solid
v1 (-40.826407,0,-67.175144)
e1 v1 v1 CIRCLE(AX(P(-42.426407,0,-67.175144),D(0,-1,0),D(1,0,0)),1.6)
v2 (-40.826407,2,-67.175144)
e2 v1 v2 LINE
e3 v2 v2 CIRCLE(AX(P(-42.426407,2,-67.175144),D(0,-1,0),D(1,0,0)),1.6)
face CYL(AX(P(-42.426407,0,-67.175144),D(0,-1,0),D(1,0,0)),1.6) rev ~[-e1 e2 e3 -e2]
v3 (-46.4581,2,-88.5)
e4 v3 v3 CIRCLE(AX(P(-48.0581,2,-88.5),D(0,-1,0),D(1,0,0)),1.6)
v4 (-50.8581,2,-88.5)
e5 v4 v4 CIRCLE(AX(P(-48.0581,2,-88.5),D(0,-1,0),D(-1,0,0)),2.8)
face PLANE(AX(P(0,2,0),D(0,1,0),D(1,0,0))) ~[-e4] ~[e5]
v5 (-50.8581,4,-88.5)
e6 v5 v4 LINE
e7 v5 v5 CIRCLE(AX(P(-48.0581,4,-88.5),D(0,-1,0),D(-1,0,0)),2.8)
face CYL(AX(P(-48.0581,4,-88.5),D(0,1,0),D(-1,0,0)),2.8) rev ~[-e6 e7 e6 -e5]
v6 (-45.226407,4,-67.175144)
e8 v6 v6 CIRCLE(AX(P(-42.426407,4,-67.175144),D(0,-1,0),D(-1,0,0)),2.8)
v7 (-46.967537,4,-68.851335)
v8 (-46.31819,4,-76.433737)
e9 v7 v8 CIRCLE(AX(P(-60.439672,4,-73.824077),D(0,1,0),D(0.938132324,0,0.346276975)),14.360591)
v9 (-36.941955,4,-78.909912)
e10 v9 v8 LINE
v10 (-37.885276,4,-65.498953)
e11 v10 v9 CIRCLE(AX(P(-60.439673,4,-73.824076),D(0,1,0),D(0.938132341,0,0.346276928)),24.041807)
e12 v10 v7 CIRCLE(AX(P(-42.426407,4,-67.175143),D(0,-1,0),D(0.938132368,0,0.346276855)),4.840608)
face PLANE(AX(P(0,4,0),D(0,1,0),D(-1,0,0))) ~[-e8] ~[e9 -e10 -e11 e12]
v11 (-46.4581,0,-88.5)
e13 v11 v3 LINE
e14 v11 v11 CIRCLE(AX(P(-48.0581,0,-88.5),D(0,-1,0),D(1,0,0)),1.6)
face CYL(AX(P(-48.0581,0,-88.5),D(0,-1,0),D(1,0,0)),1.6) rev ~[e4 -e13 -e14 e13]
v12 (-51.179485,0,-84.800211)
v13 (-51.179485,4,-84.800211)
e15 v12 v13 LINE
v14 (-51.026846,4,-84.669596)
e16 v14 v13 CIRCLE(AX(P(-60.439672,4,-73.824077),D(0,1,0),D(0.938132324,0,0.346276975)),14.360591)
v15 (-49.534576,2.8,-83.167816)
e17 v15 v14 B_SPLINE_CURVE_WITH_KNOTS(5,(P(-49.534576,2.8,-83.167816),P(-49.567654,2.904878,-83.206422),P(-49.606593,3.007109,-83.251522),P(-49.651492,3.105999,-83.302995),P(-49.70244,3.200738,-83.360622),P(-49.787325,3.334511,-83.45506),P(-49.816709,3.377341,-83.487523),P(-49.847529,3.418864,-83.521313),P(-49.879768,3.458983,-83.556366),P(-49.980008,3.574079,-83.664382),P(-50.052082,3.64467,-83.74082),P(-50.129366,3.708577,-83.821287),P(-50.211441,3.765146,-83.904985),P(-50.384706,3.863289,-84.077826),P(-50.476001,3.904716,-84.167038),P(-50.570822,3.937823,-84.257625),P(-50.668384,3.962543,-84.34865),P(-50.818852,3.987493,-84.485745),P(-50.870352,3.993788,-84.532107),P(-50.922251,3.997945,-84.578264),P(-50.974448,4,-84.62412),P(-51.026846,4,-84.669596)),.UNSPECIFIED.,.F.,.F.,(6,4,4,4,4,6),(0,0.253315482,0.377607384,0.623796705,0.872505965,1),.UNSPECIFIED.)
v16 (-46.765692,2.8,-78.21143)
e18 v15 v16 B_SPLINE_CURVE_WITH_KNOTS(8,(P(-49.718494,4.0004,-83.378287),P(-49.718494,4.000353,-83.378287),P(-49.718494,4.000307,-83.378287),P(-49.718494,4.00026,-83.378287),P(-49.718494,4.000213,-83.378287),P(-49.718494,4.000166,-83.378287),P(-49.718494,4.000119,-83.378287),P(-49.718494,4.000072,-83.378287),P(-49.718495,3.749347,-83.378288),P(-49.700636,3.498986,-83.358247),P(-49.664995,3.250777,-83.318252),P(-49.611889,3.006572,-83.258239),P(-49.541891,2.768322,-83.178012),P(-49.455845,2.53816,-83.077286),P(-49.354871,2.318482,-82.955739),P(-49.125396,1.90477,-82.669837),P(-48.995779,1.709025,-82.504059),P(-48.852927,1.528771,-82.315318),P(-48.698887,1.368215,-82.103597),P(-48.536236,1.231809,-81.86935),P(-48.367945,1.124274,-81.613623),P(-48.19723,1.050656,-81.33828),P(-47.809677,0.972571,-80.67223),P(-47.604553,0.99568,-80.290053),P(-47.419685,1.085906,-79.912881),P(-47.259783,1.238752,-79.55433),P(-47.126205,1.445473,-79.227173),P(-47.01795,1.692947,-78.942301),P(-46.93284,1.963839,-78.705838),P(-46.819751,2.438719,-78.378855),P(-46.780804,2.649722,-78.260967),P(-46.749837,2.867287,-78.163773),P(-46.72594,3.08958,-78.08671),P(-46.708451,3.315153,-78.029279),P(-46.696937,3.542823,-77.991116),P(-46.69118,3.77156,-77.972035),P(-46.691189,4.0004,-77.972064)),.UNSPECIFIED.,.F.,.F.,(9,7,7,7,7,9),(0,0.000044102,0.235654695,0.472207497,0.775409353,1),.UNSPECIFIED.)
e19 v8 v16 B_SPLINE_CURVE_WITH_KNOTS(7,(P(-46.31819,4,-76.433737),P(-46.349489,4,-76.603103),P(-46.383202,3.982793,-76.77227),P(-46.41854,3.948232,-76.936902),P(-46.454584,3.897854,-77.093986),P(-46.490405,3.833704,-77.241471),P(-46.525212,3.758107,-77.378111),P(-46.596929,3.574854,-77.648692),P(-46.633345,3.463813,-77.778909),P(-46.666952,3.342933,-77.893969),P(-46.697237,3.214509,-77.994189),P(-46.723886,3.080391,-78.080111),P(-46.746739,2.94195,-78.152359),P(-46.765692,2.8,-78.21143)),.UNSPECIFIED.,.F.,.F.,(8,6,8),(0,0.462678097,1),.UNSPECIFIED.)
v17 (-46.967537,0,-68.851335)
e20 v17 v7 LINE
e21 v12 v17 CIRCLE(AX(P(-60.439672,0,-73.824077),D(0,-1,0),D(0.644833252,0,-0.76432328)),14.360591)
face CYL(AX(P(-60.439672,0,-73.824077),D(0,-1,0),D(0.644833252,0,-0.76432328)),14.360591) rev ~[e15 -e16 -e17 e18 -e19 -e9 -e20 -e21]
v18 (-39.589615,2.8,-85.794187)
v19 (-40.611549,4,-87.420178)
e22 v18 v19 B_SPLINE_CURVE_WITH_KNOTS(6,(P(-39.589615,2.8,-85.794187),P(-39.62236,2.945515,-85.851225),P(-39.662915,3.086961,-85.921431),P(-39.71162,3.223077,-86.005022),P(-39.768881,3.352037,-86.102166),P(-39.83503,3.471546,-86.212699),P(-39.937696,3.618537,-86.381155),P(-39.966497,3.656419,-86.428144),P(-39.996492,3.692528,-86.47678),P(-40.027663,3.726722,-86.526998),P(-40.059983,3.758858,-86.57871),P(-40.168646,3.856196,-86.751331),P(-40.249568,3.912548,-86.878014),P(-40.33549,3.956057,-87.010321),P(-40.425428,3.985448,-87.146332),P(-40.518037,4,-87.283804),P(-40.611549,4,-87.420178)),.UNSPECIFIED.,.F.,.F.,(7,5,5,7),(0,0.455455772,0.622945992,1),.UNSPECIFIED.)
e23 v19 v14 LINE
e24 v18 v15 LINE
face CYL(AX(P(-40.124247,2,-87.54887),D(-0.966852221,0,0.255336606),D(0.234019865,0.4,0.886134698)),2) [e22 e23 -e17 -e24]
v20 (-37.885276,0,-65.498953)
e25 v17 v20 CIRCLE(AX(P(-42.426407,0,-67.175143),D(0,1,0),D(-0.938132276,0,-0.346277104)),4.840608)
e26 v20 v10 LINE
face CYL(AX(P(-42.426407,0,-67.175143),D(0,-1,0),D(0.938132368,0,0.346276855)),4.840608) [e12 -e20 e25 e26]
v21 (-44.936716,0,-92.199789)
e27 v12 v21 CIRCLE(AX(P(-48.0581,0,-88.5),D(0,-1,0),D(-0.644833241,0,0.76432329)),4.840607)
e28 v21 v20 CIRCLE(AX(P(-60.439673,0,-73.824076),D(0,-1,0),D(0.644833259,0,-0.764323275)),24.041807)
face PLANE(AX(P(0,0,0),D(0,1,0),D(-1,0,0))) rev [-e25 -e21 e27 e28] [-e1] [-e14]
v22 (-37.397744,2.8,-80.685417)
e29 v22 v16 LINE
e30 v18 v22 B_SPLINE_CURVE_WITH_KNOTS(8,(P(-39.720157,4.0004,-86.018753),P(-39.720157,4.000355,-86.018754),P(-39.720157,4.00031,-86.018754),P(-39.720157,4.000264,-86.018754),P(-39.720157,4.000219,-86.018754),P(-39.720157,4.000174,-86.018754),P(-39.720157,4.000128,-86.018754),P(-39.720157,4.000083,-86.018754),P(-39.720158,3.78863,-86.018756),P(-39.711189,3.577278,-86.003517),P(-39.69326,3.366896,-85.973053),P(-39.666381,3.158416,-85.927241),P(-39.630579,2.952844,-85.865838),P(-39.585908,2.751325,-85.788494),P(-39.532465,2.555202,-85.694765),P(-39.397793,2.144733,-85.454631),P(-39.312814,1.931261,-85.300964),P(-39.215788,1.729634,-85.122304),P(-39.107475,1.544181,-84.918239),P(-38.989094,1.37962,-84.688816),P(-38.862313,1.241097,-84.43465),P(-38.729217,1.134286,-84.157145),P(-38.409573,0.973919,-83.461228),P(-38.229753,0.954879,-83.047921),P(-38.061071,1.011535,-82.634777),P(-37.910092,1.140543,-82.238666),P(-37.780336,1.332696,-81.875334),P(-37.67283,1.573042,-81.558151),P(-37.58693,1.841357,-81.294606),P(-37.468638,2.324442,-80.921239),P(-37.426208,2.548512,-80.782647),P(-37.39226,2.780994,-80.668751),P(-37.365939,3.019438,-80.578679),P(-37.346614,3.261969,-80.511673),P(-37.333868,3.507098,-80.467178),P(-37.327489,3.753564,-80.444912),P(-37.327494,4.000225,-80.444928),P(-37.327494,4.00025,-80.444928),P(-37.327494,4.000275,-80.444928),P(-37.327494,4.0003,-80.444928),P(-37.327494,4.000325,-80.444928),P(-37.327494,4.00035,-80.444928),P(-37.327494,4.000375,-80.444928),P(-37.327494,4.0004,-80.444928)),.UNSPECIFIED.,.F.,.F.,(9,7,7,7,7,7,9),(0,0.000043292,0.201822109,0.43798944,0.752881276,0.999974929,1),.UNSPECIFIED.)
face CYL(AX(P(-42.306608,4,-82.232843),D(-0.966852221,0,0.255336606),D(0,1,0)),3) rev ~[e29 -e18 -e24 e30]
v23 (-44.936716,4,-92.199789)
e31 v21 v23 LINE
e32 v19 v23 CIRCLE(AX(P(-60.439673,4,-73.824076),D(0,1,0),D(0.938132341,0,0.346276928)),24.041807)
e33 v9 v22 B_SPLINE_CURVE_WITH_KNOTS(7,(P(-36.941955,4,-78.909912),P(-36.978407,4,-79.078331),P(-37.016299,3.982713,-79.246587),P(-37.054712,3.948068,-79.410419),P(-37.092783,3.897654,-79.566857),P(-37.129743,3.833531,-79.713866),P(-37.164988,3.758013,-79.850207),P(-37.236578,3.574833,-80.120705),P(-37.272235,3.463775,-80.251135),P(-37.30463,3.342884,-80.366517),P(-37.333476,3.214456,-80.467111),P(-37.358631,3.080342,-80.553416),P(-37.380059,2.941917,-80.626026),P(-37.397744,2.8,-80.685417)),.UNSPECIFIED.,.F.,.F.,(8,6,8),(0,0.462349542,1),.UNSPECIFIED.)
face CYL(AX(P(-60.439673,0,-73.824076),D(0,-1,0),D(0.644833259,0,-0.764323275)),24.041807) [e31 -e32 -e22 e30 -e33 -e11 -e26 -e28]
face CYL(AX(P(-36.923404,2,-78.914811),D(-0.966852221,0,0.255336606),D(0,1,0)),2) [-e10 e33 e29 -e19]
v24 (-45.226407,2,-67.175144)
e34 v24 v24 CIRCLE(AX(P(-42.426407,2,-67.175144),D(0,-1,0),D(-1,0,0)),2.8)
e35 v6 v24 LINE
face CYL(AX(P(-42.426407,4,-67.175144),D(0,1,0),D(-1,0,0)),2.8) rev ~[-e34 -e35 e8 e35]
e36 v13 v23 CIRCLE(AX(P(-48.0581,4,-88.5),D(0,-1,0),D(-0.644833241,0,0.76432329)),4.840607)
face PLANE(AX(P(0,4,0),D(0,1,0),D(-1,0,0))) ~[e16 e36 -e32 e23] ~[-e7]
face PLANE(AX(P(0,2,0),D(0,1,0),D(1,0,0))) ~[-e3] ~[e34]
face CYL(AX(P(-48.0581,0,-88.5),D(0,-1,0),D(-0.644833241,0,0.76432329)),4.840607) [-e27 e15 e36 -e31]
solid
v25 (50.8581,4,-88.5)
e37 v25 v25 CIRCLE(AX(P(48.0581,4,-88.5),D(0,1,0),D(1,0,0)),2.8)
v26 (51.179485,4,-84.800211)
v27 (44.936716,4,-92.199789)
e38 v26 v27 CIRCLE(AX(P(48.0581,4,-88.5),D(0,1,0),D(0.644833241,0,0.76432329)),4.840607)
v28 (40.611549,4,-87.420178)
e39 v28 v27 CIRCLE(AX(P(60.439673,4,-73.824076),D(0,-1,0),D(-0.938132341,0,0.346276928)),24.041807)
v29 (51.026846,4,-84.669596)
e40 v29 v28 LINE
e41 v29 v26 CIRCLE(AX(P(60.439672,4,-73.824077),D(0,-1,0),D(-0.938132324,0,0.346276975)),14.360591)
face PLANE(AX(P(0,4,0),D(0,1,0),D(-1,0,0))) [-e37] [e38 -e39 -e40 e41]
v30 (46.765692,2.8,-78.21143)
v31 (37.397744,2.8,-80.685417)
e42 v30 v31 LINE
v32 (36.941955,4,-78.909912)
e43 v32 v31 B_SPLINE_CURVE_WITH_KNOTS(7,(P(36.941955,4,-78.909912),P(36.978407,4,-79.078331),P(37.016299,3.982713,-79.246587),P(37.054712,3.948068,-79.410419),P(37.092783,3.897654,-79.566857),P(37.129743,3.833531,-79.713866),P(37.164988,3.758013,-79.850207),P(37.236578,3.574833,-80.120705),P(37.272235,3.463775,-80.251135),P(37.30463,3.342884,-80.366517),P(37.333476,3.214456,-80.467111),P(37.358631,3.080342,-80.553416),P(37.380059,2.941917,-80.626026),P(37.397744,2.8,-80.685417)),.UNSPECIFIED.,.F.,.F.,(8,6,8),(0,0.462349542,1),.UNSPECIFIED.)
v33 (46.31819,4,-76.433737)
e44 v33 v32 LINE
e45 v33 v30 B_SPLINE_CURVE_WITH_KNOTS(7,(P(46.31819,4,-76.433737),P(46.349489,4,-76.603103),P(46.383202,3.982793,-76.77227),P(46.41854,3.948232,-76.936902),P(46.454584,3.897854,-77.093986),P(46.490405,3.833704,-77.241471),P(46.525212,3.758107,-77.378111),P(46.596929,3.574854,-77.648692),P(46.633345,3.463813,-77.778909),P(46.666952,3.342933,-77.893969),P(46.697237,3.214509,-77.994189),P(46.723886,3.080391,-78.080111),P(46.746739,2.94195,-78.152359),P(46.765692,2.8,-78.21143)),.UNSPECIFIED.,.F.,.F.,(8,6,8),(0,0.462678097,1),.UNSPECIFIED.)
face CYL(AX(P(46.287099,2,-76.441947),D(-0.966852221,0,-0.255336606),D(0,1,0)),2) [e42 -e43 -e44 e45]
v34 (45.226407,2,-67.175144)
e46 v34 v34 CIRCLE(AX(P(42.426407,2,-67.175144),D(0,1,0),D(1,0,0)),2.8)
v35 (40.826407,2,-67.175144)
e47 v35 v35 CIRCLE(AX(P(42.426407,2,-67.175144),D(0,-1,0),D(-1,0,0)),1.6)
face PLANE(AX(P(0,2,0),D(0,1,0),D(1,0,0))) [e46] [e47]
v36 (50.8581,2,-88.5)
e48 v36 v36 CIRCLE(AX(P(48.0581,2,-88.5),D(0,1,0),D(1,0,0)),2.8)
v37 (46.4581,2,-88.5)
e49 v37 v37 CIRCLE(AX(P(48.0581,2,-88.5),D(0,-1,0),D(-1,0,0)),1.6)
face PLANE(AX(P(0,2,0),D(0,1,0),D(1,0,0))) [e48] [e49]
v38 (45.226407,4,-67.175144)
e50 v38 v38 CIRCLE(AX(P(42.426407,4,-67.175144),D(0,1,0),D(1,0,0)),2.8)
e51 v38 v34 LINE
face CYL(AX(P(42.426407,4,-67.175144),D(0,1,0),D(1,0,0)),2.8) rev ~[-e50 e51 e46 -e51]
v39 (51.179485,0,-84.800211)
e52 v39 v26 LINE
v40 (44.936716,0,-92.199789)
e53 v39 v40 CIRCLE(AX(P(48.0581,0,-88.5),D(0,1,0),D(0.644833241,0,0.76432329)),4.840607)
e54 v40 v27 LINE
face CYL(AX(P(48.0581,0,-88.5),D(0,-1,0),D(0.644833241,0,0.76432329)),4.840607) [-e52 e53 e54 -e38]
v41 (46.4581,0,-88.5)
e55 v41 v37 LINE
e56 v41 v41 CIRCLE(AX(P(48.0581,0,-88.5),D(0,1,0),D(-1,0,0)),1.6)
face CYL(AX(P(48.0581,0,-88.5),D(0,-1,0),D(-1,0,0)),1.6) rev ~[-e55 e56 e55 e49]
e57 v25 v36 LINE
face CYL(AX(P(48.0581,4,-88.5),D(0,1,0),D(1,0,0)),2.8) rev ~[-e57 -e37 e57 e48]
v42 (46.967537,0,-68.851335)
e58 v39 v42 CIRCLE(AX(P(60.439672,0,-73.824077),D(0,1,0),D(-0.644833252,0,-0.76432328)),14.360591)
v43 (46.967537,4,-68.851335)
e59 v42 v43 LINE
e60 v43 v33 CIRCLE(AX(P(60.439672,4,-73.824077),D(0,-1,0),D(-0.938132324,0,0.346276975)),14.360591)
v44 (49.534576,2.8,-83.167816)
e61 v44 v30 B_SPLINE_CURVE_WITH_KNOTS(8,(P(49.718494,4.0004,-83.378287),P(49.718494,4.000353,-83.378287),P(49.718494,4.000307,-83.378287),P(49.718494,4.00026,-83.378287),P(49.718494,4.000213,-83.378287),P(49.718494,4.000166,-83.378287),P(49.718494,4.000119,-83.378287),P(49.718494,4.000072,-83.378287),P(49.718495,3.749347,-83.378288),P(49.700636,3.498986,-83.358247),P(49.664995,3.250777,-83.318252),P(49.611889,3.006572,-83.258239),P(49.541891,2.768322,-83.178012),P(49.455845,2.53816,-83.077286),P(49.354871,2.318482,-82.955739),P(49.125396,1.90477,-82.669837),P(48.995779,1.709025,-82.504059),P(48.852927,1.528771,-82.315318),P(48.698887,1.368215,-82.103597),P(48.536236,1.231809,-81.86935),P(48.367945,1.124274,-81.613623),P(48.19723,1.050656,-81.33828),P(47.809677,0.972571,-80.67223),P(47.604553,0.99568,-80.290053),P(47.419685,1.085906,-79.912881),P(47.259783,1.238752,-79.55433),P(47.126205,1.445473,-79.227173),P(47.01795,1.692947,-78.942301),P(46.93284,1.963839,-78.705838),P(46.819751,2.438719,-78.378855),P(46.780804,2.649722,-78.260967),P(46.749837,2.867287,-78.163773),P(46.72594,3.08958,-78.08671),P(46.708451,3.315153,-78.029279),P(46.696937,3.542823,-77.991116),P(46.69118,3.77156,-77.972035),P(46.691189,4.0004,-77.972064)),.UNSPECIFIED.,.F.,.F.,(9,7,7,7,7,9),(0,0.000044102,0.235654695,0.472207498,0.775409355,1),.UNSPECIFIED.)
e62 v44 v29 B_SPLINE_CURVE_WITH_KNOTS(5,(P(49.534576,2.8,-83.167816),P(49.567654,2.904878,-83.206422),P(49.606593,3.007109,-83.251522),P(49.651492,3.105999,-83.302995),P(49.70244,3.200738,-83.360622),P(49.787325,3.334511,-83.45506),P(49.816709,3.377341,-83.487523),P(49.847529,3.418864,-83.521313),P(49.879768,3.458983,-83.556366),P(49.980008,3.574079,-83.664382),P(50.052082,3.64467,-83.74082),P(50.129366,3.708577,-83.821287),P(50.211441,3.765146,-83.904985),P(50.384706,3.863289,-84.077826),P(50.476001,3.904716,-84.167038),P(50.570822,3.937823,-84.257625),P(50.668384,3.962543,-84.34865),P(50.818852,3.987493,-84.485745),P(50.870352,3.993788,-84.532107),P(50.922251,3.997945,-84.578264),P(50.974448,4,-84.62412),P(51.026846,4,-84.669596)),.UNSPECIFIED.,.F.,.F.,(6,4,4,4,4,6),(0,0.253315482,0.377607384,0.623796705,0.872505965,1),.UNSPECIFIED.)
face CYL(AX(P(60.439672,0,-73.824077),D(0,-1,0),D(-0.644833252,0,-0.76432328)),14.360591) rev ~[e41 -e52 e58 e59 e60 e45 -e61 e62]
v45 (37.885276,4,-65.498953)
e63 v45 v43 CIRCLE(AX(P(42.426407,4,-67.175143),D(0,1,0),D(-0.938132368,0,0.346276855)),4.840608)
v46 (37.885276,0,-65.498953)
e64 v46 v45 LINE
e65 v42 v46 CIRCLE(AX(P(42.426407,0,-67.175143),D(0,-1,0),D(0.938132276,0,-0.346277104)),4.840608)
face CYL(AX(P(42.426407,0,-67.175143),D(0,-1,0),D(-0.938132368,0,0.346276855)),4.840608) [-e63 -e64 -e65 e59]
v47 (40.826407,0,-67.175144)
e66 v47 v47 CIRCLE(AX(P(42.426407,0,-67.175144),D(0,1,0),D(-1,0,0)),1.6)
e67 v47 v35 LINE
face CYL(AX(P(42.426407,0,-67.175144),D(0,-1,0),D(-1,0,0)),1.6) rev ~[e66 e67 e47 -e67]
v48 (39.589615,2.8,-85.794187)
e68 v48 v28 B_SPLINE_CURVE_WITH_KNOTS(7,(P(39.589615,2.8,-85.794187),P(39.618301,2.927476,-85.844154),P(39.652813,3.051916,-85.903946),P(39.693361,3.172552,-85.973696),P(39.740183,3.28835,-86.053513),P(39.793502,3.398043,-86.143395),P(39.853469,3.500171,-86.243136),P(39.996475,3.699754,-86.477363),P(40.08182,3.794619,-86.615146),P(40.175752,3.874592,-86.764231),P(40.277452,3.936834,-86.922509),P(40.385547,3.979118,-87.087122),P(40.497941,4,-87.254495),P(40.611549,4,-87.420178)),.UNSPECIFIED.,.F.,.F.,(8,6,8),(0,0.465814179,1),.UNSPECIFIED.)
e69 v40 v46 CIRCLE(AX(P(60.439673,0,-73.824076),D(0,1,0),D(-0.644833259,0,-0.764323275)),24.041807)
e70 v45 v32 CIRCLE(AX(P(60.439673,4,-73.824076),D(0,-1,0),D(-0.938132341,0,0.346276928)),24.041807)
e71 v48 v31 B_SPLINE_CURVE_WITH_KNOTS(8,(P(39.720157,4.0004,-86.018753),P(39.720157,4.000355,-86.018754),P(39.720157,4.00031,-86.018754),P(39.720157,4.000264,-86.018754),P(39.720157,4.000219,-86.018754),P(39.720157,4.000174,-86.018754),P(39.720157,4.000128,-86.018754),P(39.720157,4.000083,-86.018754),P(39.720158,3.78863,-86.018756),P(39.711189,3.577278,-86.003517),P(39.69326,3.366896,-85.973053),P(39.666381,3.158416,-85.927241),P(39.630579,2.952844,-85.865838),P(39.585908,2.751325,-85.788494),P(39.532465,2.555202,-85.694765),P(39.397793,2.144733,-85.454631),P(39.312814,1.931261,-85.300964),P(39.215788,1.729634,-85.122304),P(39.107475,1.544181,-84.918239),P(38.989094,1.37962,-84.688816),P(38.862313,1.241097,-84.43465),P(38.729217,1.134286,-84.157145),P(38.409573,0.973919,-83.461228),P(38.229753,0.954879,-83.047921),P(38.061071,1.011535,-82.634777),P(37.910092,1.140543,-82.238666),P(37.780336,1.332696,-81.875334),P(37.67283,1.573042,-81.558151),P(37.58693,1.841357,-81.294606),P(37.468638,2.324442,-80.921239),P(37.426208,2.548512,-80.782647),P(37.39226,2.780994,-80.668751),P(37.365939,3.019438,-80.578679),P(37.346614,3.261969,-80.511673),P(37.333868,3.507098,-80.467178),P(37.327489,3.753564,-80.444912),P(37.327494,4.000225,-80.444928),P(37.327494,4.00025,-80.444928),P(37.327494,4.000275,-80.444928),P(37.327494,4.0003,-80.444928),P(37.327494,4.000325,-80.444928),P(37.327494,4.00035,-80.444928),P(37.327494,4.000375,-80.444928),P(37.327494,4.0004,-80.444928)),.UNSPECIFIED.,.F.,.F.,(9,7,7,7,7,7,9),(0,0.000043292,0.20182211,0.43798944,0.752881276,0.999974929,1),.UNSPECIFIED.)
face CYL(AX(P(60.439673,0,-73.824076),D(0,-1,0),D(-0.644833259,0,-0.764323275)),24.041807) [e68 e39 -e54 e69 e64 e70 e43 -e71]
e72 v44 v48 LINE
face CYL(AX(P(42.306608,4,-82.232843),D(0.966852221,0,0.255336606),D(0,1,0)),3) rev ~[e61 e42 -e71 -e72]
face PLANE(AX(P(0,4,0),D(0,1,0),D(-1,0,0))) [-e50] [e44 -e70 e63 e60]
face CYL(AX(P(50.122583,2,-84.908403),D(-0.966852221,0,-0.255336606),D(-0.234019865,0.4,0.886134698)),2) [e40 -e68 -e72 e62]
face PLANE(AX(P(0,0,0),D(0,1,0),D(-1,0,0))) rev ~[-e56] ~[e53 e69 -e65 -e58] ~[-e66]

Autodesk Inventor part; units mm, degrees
ref_plane "YZ Plane" through (0, 0, 0) normal (1, 0, 0) x (0, 1, 0)
sketch "Sketch1" plane through (0, 0, 0) normal (0, 1, 0) x (-1, 0, 0)
  circle A0 centre (0, 0) radius 110 construction
  arc A1 (43.0581, -98.5) -> (-43.0581, -98.5) centre (0, 0) ccw
  line L0 (0, -107.5) -> (0, -98.5) construction
  line L1 (0, -98.5) -> (0, -73.5) construction
  line L2 (0, -98.5) -> (-43.0581, -98.5) construction
  line L3 (0, -98.5) -> (43.0581, -98.5) construction
  line L4 (43.0581, -98.5) -> (-43.0581, -98.5) construction
  line L5 (-18.0581, -73.5) -> (18.0581, -73.5)
  arc A2 (43.0581, -98.5) -> (18.0581, -73.5) centre (18.0581, -98.5) ccw
  arc A3 (-18.0581, -73.5) -> (-43.0581, -98.5) centre (-18.0581, -98.5) ccw
  line L6 (0, 107.5) -> (0, 97.5) construction
  line L7 (0, 97.5) -> (-22.5, 97.5) construction
  line L8 (-22.5, 97.5) -> (-22.5, 82.5) construction
  line L9 (22.5, 82.5) -> (22.5, 97.5) construction
  line L10 (22.5, 90) -> (-22.5, 90) construction
  line L11 (15, 97.5) -> (-15, 97.5)
  line L12 (-15, 82.5) -> (15, 82.5)
  arc A4 (15, 82.5) -> (15, 97.5) centre (15, 90) ccw
  arc A5 (-15, 97.5) -> (-15, 82.5) centre (-15, 90) ccw
  line L13 (22.5, 82.5) -> (17.5, 82.5) construction
  line L14 (17.5, 82.5) -> (17.5, 77.5) construction
  circle A6 centre (17.5, 77.5) radius 1.6
  circle A7 centre (-17.5, 77.5) radius 1.6
  line L15 (-58.336309, 79.549513) -> (-79.549513, 58.336309)
  arc A8 (-47.729708, 68.942911) -> (-58.336309, 79.549513) centre (-53.033009, 74.246212) ccw
  arc A9 (-79.549513, 58.336309) -> (-68.942911, 47.729708) centre (-74.246212, 53.033009) ccw
  line L16 (-68.942911, 47.729708) -> (-47.729708, 68.942911)
  circle A10 centre (-67.175144, 42.426407) radius 1.6
  circle A11 centre (-42.426407, 67.175144) radius 1.6
  line L17 (-97.5, 15) -> (-97.5, -15)
  arc A12 (-82.5, 15) -> (-97.5, 15) centre (-90, 15) ccw
  arc A13 (-97.5, -15) -> (-82.5, -15) centre (-90, -15) ccw
  line L18 (-82.5, -15) -> (-82.5, 15)
  circle A14 centre (-77.5, -17.5) radius 1.6
  circle A15 centre (-77.5, 17.5) radius 1.6
  line L19 (-79.549513, -58.336309) -> (-58.336309, -79.549513)
  arc A16 (-68.942911, -47.729708) -> (-79.549513, -58.336309) centre (-74.246212, -53.033009) ccw
  arc A17 (-58.336309, -79.549513) -> (-47.729708, -68.942911) centre (-53.033009, -74.246212) ccw
  line L20 (-47.729708, -68.942911) -> (-68.942911, -47.729708)
  circle A18 centre (-42.426407, -67.175144) radius 1.6
  circle A19 centre (-67.175144, -42.426407) radius 1.6
  line L21 (-15, -97.5) -> (15, -97.5)
  arc A20 (-15, -82.5) -> (-15, -97.5) centre (-15, -90) ccw
  arc A21 (15, -97.5) -> (15, -82.5) centre (15, -90) ccw
  line L22 (15, -82.5) -> (-15, -82.5)
  circle A22 centre (17.5, -77.5) radius 1.6
  circle A23 centre (-17.5, -77.5) radius 1.6
  line L23 (58.336309, -79.549513) -> (79.549513, -58.336309)
  arc A24 (47.729708, -68.942911) -> (58.336309, -79.549513) centre (53.033009, -74.246212) ccw
  arc A25 (79.549513, -58.336309) -> (68.942911, -47.729708) centre (74.246212, -53.033009) ccw
  line L24 (68.942911, -47.729708) -> (47.729708, -68.942911)
  circle A26 centre (67.175144, -42.426407) radius 1.6
  circle A27 centre (42.426407, -67.175144) radius 1.6
  line L25 (97.5, -15) -> (97.5, 15)
  arc A28 (82.5, -15) -> (97.5, -15) centre (90, -15) ccw
  arc A29 (97.5, 15) -> (82.5, 15) centre (90, 15) ccw
  line L26 (82.5, 15) -> (82.5, -15)
  circle A30 centre (77.5, 17.5) radius 1.6
  circle A31 centre (77.5, -17.5) radius 1.6
  line L27 (79.549513, 58.336309) -> (58.336309, 79.549513)
  arc A32 (68.942911, 47.729708) -> (79.549513, 58.336309) centre (74.246212, 53.033009) ccw
  arc A33 (58.336309, 79.549513) -> (47.729708, 68.942911) centre (53.033009, 74.246212) ccw
  line L28 (47.729708, 68.942911) -> (68.942911, 47.729708)
  circle A34 centre (42.426407, 67.175144) radius 1.6
  circle A35 centre (67.175144, 42.426407) radius 1.6
  line L29 (58.336309, -58.336309) -> (51.265242, -51.265242) construction
  line L30 (40.65864, -61.871843) -> (61.871843, -40.65864)
  arc A36 (40.65864, -61.871843) -> (44.52672, -89.539774) centre (53.033009, -74.246212) ccw
  arc A37 (89.539774, -44.52672) -> (61.871843, -40.65864) centre (74.246212, -53.033009) ccw
  line L31 (0, -73.5) -> (0, -66.5) construction
  arc A38 (44.52672, 89.539774) -> (40.65864, 61.871843) centre (53.033009, 74.246212) ccw
  line L32 (61.871843, 40.65864) -> (40.65864, 61.871843)
  arc A39 (61.871843, 40.65864) -> (89.539774, 44.52672) centre (74.246212, 53.033009) ccw
  arc A40 (-89.539774, 44.52672) -> (-61.871843, 40.65864) centre (-74.246212, 53.033009) ccw
  line L33 (-40.65864, 61.871843) -> (-61.871843, 40.65864)
  arc A41 (-40.65864, 61.871843) -> (-44.52672, 89.539774) centre (-53.033009, 74.246212) ccw
  arc A42 (-44.52672, -89.539774) -> (-40.65864, -61.871843) centre (-53.033009, -74.246212) ccw
  line L34 (-61.871843, -40.65864) -> (-40.65864, -61.871843)
  arc A43 (-61.871843, -40.65864) -> (-89.539774, -44.52672) centre (-74.246212, -53.033009) ccw
  arc A44 (89.539774, -44.52672) -> (89.539774, 44.52672) centre (0, 0) ccw
  arc A45 (44.52672, 89.539774) -> (-44.52672, 89.539774) centre (0, 0) ccw
  arc A46 (-89.539774, 44.52672) -> (-89.539774, -44.52672) centre (0, 0) ccw
  line L35 (43.0581, -98.5) -> (48.0581, -98.5) construction
  line L36 (48.0581, -98.5) -> (48.0581, -88.5) construction
  circle A47 centre (48.0581, -88.5) radius 1.6
  circle A48 centre (-48.0581, -88.5) radius 1.6
  line L37 (18.0581, -66.5) -> (-18.0581, -66.5)
  arc A49 (17.5, -66.5) -> (43.0581, -59.472383) centre (19.514525, -23.837671) ccw
  arc A50 (-44.52672, -58.003763) -> (-18.0581, -66.5) centre (-19.508856, -25.542168) ccw
  arc A51 (-48.0581, -88.5) -> (-42.426407, -67.175144) centre (-60.43967, -73.824078) ccw construction
  arc A52 (-48.0581, -88.5) -> (-42.426407, -67.175144) centre (-60.43967, -73.824078) ccw construction
  arc A53 (-44.936716, -92.199789) -> (-37.885276, -65.498953) centre (-60.43967, -73.824078) ccw
  arc A54 (-51.179485, -84.800211) -> (-46.967537, -68.851335) centre (-60.43967, -73.824078) ccw
  arc A55 (-51.179485, -84.800211) -> (-44.936716, -92.199789) centre (-48.0581, -88.5) ccw
  arc A56 (-37.885276, -65.498953) -> (-46.967537, -68.851335) centre (-42.426407, -67.175144) ccw
  point P0 (0, 90)
  point P1 (-45.961941, 70.710678)
  point P2 (-82.5, 17.5)
  point P3 (-70.710678, -45.961941)
  point P4 (-17.5, -82.5)
  point P5 (45.961941, -70.710678)
  point P6 (82.5, -17.5)
  point P7 (70.710678, 45.961941)
  point P8 (35.715922, -76.769806)
  point P9 (-37.90233, -65.453455)
  point P10 (-39.097126, -63.661261)
  point P11 (-46.422064, -70.704261)
  point P12 (-46.867306, -78.516354)
  point P13 (0, -44.52672)
  point P14 (0, 35.701561)
  dimension "d0" = 220
  dimension "d1" = 215
  dimension "d2" = 9
  dimension "d3" = 25
  dimension "d4" = 10
  dimension "d5" = 22.5
  dimension "d6" = 15
  dimension "d7" = 45
  dimension "d8" = 5
  dimension "d9" = 5
  dimension "d10" = 3.2
  dimension "d15" = 86.1162
  dimension "d16" = 45
  dimension "d19" = 360
  dimension "d22" = 10
  dimension "d23" = 7
  dimension "d26" = 360
  dimension "d33" = 5
  dimension "d34" = 10
  dimension "d35" = 3.2
extrude "Extrusion5" add sketch "Sketch1" along normal blind 4 contours A53 A55 A54 A17 A56 A42 | A42 A56 | A54 A17
sketch "Sketch6" plane through (0, 4, 0) normal (0, 1, 0) x (1, 0, 0)
  circle A0 centre (42.426407, 67.175144) radius 1.6
  circle A1 centre (42.426407, 67.175144) radius 2.8
  circle A2 centre (48.0581, 88.5) radius 1.6
  circle A3 centre (48.0581, 88.5) radius 2.8
  point P0 (0, 0)
  dimension "d56" = 5.6
  dimension "d57" = 5.6
extrude "Extrusion6" cut sketch "Sketch6" against normal blind 2 contours A0 | A1 | A2 | A3
ref_plane "Work Plane2" through (37.885276, 0, -65.498953) normal (-0.9668522, 0, -0.2553366) x (0, 1, 0)
sketch "Sketch7" plane through (37.885276, 0, -65.498953) normal (-0.9668522, 0, -0.2553366) x (0, 1, 0)
  line L0 (0, 27.616253) -> (4, 27.616253)
  line L1 (2, 27.616253) -> (2, 0) construction
  line L2 (0, 0) -> (4, 0)
  line L3 (2, 13.808127) -> (5.678788, 13.808127) construction
  line L4 (5.678788, 13.808127) -> (5.678788, 17.308127) construction
  line L5 (5.678788, 17.308127) -> (4, 17.308127) construction
  line L6 (4, 0) -> (4, 27.616253) construction
  circle A0 centre (4, 17.308127) radius 3
  point P0 (0, -73.001305)
  dimension "d60" = 27.61625
  dimension "d61" = 13.80813
  dimension "d62" = 3.5
  dimension "d63" = 6
extrude "Extrusion7" cut sketch "Sketch7" along normal mid plane 19.75
fillet "Fillet3" radius 2 2 edges at (44.7193, 4, -84.6985) (42.0093, 4, -79.2085)
sketch "Sketch8" plane through (0, 4, 0) normal (0, 1, 0) x (1, 0, 0)
  point P0 (0, 0)
  point P1 (0, 45.087656)
  point P2 (0, -47.461168)
ref_plane "Work Plane4" through (0, 0, -44.52672) normal (1, 0, 0) x (0, 0.9903099, -0.1388753)
mirror "Mirror2" about plane through (0, 0, -44.52672) normal (1, 0, 0) of "Extrusion5", "Extrusion6", "Extrusion7", "Fillet3"
ref_plane "Work Plane5" through (-37.885276, 0, -65.498953) normal (-0.9668522, 0, 0.2553366) x (0, 1, 0)
properties part number "MettalringUnten_v3"
